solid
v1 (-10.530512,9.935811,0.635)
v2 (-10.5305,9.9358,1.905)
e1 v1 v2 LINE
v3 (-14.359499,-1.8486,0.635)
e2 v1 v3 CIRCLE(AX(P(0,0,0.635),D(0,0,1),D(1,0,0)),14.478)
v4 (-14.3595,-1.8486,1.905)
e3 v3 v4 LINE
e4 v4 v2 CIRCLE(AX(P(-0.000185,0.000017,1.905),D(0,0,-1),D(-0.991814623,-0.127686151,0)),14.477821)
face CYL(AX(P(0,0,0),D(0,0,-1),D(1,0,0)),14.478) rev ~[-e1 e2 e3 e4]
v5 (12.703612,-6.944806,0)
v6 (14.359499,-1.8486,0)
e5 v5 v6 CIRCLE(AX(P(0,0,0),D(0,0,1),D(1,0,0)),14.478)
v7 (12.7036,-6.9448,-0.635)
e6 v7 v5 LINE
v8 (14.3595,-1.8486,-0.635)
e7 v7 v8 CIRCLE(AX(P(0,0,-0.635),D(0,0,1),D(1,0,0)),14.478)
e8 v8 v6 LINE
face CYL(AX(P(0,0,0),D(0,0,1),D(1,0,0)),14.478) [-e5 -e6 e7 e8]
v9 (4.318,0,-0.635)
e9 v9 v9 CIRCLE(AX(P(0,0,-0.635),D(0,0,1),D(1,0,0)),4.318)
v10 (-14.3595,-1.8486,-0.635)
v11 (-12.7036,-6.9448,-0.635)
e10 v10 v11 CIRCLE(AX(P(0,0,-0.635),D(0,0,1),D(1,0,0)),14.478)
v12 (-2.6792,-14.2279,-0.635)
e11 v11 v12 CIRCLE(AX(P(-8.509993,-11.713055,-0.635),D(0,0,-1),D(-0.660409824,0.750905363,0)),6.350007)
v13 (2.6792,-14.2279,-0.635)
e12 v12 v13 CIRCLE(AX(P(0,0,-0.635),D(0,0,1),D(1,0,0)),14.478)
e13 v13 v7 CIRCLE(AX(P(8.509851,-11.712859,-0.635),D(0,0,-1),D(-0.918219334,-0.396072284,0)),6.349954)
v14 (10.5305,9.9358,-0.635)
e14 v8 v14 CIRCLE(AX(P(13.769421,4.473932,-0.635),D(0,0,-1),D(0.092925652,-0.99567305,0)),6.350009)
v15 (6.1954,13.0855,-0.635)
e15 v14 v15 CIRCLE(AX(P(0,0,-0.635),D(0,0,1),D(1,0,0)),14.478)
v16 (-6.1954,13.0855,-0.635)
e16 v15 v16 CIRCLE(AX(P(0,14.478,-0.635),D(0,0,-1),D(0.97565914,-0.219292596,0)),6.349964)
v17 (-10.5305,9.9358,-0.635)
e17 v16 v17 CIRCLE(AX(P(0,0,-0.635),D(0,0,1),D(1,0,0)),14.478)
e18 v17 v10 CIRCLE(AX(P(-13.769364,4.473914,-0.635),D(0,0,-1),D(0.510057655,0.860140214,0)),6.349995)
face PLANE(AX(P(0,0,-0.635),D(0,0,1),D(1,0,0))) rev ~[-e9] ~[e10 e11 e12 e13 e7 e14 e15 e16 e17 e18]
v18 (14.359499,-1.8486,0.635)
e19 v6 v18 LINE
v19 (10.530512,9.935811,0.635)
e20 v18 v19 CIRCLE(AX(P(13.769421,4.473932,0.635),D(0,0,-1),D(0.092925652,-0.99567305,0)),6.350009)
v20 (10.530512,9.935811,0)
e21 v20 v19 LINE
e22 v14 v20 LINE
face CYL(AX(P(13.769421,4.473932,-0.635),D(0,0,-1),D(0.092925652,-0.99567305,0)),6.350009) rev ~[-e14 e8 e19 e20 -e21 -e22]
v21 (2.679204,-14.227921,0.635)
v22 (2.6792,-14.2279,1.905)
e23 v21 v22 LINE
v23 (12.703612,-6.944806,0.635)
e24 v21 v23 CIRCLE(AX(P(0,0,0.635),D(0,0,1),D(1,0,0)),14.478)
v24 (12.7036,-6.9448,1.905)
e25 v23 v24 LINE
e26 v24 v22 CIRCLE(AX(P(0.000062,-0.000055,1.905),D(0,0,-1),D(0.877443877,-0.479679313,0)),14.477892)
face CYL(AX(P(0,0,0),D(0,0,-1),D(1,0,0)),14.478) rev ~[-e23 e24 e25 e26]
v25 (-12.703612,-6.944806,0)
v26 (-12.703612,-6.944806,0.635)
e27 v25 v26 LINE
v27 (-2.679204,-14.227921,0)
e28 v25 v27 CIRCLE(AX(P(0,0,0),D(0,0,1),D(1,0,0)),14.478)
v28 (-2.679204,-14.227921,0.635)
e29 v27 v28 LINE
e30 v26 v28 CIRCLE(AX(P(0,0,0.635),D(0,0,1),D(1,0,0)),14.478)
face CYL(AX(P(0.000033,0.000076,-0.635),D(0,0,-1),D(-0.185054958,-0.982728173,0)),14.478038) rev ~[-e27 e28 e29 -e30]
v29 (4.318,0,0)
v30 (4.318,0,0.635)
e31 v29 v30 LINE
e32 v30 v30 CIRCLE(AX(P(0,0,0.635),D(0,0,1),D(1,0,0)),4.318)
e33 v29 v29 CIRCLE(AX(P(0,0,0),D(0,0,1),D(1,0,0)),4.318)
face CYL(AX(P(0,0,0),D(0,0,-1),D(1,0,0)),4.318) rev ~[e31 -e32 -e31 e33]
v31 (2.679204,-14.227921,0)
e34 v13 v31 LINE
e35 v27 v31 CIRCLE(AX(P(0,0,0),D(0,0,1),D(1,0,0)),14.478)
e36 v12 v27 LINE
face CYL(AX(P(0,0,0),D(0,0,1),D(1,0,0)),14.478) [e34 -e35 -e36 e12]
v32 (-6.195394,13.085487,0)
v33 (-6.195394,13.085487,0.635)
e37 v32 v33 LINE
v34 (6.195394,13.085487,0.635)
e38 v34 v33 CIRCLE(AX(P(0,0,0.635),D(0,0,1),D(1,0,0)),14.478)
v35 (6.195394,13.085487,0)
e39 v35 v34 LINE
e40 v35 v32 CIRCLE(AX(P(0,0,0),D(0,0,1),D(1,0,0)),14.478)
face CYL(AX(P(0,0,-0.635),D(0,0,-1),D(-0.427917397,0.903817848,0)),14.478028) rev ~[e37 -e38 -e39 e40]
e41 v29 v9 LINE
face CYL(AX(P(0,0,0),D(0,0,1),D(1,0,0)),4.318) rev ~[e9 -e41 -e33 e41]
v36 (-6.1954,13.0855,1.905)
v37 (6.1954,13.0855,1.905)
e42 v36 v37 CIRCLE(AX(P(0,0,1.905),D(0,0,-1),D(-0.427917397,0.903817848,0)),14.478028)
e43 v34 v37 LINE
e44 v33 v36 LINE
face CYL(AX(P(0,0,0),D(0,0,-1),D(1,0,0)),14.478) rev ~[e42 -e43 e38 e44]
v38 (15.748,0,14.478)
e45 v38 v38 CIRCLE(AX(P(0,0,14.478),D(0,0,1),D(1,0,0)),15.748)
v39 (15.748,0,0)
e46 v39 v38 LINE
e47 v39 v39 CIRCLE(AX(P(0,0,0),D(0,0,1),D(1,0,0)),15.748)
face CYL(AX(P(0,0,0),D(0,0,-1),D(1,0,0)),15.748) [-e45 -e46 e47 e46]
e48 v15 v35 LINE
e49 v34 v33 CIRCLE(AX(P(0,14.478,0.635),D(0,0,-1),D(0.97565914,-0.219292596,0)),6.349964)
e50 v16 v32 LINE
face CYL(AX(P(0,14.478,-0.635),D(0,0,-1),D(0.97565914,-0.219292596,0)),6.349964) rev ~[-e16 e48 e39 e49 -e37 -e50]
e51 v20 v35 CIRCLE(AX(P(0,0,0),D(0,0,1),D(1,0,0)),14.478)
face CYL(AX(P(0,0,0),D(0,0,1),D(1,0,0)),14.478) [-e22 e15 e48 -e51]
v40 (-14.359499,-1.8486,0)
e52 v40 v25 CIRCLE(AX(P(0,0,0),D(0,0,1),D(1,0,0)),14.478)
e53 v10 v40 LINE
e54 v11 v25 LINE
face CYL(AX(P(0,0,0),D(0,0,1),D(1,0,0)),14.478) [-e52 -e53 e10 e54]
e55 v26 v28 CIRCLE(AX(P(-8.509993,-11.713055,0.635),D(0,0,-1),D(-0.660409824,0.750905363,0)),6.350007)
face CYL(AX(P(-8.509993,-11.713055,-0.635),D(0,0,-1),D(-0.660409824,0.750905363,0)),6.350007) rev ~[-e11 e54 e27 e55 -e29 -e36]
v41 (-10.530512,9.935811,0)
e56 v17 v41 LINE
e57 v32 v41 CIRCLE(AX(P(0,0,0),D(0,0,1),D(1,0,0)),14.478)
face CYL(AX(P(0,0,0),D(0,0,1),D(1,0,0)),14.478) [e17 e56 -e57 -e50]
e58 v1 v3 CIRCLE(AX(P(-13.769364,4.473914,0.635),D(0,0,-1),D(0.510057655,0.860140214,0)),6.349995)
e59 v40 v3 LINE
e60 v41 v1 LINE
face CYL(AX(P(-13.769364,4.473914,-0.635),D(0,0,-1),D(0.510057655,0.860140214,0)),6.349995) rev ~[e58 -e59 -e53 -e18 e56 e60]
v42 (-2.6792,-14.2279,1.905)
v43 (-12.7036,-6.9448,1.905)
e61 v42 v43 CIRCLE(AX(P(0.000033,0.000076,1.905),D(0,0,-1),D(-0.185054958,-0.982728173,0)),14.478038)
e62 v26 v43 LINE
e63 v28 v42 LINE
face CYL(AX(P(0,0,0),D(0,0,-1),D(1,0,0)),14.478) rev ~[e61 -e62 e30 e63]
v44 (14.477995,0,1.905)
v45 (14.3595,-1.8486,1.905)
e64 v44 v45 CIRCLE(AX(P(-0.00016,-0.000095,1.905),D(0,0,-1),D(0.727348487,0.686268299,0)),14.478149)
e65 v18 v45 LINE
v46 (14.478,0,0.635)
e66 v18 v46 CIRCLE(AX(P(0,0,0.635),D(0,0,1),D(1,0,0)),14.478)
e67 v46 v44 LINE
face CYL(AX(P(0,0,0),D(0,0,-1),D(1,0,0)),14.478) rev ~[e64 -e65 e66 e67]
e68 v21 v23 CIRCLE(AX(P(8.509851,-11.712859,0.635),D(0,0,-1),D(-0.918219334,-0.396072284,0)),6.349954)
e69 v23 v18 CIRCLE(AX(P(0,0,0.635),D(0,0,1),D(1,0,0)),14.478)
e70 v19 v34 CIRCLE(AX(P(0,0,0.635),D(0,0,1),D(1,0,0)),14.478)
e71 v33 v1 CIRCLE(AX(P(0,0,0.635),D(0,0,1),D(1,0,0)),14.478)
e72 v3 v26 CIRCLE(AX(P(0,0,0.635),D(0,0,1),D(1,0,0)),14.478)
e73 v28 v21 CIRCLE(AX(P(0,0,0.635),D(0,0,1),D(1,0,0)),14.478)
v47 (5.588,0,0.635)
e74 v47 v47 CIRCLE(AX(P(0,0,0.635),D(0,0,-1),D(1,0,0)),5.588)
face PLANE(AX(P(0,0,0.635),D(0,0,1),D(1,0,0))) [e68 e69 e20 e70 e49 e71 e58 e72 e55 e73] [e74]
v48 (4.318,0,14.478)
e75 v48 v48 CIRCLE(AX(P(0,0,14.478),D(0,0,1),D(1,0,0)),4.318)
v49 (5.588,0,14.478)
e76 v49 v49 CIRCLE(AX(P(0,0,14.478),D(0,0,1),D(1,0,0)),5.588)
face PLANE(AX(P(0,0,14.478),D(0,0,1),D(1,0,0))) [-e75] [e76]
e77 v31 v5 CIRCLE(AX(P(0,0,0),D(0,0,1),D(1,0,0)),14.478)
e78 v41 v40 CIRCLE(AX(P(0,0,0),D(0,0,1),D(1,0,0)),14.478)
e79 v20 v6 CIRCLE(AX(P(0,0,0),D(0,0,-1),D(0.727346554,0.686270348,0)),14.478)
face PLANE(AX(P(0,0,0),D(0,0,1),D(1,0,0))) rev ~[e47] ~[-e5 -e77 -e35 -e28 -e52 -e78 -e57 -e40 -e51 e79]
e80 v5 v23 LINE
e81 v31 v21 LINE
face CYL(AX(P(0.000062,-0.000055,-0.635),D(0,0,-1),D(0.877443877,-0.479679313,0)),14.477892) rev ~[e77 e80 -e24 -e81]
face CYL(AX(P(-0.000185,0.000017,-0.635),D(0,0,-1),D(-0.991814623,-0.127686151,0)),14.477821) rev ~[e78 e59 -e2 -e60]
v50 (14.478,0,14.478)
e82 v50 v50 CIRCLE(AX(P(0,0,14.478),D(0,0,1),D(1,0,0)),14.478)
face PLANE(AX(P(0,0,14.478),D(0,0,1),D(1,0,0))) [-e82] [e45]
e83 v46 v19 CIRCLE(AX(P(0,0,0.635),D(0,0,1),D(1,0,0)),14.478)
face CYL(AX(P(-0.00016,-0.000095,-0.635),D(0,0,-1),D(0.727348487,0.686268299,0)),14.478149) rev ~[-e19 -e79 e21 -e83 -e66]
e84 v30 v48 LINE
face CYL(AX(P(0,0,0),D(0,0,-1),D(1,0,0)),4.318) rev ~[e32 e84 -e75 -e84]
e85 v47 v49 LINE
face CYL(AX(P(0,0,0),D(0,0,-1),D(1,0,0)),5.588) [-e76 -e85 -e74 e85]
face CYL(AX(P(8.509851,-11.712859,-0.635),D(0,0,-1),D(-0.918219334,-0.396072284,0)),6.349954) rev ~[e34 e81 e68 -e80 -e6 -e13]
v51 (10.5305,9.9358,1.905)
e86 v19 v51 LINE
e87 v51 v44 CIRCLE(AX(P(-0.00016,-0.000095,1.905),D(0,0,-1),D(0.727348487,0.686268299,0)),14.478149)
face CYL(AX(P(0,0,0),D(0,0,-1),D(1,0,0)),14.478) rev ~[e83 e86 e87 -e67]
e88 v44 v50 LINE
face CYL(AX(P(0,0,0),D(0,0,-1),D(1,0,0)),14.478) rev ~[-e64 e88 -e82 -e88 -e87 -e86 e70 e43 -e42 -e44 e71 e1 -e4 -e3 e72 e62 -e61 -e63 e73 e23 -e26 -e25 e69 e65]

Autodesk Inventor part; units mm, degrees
ref_plane "YZ Plane" through (0, 0, 0) normal (1, 0, 0) x (0, 1, 0)
ref_plane "XZ Plane" through (0, 0, 0) normal (0, 1, 0) x (-1, 0, 0)
ref_plane "XY Plane" through (0, 0, 0) normal (0, 0, 1) x (1, 0, 0)
sketch "Sketch1" plane through (0, 0, 0) normal (0, 0, 1) x (1, 0, 0)
  circle A0 centre (0, 0) radius 5.588
  circle A1 centre (0, 0) radius 4.318
  circle A2 centre (0, 0) radius 14.478
  circle A3 centre (0, 0) radius 15.748
  dimension "d0" = 1.27
  dimension "d1" = 11.176
  dimension "d2" = 1.27
  dimension "d3" = 8.89
extrude "Extrusion1" add sketch "Sketch1" along normal blind 14.478
sketch "Sketch3" plane through (0, 0, 14.478) normal (0, 0, 1) x (1, 0, 0)
  point P0 (0, 0)
extrude "Extrusion2" add sketch "Sketch1" along normal mid plane 1.27 contours A0 | A2
sketch "Sketch4" plane through (0, 0, -0.635) normal (0, 0, -1) x (-1, 0, 0)
  arc A0 (-6.1954, 13.0855) -> (6.1954, 13.0855) centre (0, 14.478) ccw
  arc A1 (6.1954, 13.0855) -> (-6.1954, 13.0855) centre (0, 0) ccw
  arc A2 (-14.3595, -1.8486) -> (-10.5305, 9.9358) centre (-13.7694, 4.4739) ccw
  arc A3 (-10.5305, 9.9358) -> (-14.3595, -1.8486) centre (0, 0) ccw
  arc A4 (-2.6792, -14.2279) -> (-12.7036, -6.9448) centre (-8.51, -11.7129) ccw
  arc A5 (-12.7036, -6.9448) -> (-2.6792, -14.2279) centre (0, 0) ccw
  arc A6 (12.7036, -6.9448) -> (2.6792, -14.2279) centre (8.51, -11.7129) ccw
  arc A7 (2.6792, -14.2279) -> (12.7036, -6.9448) centre (0, 0) ccw
  arc A8 (10.5305, 9.9358) -> (14.3595, -1.8486) centre (13.7694, 4.4739) ccw
  arc A9 (14.3595, -1.8486) -> (10.5305, 9.9358) centre (0, 0) ccw
  point P0 (0, 0)
  dimension "d8" = 12.7
  dimension "d11" = 360
extrude "Extrusion3" cut sketch "Sketch4" against normal blind 2.54
properties part number "WheelDE" material "PMMA Plastic"
